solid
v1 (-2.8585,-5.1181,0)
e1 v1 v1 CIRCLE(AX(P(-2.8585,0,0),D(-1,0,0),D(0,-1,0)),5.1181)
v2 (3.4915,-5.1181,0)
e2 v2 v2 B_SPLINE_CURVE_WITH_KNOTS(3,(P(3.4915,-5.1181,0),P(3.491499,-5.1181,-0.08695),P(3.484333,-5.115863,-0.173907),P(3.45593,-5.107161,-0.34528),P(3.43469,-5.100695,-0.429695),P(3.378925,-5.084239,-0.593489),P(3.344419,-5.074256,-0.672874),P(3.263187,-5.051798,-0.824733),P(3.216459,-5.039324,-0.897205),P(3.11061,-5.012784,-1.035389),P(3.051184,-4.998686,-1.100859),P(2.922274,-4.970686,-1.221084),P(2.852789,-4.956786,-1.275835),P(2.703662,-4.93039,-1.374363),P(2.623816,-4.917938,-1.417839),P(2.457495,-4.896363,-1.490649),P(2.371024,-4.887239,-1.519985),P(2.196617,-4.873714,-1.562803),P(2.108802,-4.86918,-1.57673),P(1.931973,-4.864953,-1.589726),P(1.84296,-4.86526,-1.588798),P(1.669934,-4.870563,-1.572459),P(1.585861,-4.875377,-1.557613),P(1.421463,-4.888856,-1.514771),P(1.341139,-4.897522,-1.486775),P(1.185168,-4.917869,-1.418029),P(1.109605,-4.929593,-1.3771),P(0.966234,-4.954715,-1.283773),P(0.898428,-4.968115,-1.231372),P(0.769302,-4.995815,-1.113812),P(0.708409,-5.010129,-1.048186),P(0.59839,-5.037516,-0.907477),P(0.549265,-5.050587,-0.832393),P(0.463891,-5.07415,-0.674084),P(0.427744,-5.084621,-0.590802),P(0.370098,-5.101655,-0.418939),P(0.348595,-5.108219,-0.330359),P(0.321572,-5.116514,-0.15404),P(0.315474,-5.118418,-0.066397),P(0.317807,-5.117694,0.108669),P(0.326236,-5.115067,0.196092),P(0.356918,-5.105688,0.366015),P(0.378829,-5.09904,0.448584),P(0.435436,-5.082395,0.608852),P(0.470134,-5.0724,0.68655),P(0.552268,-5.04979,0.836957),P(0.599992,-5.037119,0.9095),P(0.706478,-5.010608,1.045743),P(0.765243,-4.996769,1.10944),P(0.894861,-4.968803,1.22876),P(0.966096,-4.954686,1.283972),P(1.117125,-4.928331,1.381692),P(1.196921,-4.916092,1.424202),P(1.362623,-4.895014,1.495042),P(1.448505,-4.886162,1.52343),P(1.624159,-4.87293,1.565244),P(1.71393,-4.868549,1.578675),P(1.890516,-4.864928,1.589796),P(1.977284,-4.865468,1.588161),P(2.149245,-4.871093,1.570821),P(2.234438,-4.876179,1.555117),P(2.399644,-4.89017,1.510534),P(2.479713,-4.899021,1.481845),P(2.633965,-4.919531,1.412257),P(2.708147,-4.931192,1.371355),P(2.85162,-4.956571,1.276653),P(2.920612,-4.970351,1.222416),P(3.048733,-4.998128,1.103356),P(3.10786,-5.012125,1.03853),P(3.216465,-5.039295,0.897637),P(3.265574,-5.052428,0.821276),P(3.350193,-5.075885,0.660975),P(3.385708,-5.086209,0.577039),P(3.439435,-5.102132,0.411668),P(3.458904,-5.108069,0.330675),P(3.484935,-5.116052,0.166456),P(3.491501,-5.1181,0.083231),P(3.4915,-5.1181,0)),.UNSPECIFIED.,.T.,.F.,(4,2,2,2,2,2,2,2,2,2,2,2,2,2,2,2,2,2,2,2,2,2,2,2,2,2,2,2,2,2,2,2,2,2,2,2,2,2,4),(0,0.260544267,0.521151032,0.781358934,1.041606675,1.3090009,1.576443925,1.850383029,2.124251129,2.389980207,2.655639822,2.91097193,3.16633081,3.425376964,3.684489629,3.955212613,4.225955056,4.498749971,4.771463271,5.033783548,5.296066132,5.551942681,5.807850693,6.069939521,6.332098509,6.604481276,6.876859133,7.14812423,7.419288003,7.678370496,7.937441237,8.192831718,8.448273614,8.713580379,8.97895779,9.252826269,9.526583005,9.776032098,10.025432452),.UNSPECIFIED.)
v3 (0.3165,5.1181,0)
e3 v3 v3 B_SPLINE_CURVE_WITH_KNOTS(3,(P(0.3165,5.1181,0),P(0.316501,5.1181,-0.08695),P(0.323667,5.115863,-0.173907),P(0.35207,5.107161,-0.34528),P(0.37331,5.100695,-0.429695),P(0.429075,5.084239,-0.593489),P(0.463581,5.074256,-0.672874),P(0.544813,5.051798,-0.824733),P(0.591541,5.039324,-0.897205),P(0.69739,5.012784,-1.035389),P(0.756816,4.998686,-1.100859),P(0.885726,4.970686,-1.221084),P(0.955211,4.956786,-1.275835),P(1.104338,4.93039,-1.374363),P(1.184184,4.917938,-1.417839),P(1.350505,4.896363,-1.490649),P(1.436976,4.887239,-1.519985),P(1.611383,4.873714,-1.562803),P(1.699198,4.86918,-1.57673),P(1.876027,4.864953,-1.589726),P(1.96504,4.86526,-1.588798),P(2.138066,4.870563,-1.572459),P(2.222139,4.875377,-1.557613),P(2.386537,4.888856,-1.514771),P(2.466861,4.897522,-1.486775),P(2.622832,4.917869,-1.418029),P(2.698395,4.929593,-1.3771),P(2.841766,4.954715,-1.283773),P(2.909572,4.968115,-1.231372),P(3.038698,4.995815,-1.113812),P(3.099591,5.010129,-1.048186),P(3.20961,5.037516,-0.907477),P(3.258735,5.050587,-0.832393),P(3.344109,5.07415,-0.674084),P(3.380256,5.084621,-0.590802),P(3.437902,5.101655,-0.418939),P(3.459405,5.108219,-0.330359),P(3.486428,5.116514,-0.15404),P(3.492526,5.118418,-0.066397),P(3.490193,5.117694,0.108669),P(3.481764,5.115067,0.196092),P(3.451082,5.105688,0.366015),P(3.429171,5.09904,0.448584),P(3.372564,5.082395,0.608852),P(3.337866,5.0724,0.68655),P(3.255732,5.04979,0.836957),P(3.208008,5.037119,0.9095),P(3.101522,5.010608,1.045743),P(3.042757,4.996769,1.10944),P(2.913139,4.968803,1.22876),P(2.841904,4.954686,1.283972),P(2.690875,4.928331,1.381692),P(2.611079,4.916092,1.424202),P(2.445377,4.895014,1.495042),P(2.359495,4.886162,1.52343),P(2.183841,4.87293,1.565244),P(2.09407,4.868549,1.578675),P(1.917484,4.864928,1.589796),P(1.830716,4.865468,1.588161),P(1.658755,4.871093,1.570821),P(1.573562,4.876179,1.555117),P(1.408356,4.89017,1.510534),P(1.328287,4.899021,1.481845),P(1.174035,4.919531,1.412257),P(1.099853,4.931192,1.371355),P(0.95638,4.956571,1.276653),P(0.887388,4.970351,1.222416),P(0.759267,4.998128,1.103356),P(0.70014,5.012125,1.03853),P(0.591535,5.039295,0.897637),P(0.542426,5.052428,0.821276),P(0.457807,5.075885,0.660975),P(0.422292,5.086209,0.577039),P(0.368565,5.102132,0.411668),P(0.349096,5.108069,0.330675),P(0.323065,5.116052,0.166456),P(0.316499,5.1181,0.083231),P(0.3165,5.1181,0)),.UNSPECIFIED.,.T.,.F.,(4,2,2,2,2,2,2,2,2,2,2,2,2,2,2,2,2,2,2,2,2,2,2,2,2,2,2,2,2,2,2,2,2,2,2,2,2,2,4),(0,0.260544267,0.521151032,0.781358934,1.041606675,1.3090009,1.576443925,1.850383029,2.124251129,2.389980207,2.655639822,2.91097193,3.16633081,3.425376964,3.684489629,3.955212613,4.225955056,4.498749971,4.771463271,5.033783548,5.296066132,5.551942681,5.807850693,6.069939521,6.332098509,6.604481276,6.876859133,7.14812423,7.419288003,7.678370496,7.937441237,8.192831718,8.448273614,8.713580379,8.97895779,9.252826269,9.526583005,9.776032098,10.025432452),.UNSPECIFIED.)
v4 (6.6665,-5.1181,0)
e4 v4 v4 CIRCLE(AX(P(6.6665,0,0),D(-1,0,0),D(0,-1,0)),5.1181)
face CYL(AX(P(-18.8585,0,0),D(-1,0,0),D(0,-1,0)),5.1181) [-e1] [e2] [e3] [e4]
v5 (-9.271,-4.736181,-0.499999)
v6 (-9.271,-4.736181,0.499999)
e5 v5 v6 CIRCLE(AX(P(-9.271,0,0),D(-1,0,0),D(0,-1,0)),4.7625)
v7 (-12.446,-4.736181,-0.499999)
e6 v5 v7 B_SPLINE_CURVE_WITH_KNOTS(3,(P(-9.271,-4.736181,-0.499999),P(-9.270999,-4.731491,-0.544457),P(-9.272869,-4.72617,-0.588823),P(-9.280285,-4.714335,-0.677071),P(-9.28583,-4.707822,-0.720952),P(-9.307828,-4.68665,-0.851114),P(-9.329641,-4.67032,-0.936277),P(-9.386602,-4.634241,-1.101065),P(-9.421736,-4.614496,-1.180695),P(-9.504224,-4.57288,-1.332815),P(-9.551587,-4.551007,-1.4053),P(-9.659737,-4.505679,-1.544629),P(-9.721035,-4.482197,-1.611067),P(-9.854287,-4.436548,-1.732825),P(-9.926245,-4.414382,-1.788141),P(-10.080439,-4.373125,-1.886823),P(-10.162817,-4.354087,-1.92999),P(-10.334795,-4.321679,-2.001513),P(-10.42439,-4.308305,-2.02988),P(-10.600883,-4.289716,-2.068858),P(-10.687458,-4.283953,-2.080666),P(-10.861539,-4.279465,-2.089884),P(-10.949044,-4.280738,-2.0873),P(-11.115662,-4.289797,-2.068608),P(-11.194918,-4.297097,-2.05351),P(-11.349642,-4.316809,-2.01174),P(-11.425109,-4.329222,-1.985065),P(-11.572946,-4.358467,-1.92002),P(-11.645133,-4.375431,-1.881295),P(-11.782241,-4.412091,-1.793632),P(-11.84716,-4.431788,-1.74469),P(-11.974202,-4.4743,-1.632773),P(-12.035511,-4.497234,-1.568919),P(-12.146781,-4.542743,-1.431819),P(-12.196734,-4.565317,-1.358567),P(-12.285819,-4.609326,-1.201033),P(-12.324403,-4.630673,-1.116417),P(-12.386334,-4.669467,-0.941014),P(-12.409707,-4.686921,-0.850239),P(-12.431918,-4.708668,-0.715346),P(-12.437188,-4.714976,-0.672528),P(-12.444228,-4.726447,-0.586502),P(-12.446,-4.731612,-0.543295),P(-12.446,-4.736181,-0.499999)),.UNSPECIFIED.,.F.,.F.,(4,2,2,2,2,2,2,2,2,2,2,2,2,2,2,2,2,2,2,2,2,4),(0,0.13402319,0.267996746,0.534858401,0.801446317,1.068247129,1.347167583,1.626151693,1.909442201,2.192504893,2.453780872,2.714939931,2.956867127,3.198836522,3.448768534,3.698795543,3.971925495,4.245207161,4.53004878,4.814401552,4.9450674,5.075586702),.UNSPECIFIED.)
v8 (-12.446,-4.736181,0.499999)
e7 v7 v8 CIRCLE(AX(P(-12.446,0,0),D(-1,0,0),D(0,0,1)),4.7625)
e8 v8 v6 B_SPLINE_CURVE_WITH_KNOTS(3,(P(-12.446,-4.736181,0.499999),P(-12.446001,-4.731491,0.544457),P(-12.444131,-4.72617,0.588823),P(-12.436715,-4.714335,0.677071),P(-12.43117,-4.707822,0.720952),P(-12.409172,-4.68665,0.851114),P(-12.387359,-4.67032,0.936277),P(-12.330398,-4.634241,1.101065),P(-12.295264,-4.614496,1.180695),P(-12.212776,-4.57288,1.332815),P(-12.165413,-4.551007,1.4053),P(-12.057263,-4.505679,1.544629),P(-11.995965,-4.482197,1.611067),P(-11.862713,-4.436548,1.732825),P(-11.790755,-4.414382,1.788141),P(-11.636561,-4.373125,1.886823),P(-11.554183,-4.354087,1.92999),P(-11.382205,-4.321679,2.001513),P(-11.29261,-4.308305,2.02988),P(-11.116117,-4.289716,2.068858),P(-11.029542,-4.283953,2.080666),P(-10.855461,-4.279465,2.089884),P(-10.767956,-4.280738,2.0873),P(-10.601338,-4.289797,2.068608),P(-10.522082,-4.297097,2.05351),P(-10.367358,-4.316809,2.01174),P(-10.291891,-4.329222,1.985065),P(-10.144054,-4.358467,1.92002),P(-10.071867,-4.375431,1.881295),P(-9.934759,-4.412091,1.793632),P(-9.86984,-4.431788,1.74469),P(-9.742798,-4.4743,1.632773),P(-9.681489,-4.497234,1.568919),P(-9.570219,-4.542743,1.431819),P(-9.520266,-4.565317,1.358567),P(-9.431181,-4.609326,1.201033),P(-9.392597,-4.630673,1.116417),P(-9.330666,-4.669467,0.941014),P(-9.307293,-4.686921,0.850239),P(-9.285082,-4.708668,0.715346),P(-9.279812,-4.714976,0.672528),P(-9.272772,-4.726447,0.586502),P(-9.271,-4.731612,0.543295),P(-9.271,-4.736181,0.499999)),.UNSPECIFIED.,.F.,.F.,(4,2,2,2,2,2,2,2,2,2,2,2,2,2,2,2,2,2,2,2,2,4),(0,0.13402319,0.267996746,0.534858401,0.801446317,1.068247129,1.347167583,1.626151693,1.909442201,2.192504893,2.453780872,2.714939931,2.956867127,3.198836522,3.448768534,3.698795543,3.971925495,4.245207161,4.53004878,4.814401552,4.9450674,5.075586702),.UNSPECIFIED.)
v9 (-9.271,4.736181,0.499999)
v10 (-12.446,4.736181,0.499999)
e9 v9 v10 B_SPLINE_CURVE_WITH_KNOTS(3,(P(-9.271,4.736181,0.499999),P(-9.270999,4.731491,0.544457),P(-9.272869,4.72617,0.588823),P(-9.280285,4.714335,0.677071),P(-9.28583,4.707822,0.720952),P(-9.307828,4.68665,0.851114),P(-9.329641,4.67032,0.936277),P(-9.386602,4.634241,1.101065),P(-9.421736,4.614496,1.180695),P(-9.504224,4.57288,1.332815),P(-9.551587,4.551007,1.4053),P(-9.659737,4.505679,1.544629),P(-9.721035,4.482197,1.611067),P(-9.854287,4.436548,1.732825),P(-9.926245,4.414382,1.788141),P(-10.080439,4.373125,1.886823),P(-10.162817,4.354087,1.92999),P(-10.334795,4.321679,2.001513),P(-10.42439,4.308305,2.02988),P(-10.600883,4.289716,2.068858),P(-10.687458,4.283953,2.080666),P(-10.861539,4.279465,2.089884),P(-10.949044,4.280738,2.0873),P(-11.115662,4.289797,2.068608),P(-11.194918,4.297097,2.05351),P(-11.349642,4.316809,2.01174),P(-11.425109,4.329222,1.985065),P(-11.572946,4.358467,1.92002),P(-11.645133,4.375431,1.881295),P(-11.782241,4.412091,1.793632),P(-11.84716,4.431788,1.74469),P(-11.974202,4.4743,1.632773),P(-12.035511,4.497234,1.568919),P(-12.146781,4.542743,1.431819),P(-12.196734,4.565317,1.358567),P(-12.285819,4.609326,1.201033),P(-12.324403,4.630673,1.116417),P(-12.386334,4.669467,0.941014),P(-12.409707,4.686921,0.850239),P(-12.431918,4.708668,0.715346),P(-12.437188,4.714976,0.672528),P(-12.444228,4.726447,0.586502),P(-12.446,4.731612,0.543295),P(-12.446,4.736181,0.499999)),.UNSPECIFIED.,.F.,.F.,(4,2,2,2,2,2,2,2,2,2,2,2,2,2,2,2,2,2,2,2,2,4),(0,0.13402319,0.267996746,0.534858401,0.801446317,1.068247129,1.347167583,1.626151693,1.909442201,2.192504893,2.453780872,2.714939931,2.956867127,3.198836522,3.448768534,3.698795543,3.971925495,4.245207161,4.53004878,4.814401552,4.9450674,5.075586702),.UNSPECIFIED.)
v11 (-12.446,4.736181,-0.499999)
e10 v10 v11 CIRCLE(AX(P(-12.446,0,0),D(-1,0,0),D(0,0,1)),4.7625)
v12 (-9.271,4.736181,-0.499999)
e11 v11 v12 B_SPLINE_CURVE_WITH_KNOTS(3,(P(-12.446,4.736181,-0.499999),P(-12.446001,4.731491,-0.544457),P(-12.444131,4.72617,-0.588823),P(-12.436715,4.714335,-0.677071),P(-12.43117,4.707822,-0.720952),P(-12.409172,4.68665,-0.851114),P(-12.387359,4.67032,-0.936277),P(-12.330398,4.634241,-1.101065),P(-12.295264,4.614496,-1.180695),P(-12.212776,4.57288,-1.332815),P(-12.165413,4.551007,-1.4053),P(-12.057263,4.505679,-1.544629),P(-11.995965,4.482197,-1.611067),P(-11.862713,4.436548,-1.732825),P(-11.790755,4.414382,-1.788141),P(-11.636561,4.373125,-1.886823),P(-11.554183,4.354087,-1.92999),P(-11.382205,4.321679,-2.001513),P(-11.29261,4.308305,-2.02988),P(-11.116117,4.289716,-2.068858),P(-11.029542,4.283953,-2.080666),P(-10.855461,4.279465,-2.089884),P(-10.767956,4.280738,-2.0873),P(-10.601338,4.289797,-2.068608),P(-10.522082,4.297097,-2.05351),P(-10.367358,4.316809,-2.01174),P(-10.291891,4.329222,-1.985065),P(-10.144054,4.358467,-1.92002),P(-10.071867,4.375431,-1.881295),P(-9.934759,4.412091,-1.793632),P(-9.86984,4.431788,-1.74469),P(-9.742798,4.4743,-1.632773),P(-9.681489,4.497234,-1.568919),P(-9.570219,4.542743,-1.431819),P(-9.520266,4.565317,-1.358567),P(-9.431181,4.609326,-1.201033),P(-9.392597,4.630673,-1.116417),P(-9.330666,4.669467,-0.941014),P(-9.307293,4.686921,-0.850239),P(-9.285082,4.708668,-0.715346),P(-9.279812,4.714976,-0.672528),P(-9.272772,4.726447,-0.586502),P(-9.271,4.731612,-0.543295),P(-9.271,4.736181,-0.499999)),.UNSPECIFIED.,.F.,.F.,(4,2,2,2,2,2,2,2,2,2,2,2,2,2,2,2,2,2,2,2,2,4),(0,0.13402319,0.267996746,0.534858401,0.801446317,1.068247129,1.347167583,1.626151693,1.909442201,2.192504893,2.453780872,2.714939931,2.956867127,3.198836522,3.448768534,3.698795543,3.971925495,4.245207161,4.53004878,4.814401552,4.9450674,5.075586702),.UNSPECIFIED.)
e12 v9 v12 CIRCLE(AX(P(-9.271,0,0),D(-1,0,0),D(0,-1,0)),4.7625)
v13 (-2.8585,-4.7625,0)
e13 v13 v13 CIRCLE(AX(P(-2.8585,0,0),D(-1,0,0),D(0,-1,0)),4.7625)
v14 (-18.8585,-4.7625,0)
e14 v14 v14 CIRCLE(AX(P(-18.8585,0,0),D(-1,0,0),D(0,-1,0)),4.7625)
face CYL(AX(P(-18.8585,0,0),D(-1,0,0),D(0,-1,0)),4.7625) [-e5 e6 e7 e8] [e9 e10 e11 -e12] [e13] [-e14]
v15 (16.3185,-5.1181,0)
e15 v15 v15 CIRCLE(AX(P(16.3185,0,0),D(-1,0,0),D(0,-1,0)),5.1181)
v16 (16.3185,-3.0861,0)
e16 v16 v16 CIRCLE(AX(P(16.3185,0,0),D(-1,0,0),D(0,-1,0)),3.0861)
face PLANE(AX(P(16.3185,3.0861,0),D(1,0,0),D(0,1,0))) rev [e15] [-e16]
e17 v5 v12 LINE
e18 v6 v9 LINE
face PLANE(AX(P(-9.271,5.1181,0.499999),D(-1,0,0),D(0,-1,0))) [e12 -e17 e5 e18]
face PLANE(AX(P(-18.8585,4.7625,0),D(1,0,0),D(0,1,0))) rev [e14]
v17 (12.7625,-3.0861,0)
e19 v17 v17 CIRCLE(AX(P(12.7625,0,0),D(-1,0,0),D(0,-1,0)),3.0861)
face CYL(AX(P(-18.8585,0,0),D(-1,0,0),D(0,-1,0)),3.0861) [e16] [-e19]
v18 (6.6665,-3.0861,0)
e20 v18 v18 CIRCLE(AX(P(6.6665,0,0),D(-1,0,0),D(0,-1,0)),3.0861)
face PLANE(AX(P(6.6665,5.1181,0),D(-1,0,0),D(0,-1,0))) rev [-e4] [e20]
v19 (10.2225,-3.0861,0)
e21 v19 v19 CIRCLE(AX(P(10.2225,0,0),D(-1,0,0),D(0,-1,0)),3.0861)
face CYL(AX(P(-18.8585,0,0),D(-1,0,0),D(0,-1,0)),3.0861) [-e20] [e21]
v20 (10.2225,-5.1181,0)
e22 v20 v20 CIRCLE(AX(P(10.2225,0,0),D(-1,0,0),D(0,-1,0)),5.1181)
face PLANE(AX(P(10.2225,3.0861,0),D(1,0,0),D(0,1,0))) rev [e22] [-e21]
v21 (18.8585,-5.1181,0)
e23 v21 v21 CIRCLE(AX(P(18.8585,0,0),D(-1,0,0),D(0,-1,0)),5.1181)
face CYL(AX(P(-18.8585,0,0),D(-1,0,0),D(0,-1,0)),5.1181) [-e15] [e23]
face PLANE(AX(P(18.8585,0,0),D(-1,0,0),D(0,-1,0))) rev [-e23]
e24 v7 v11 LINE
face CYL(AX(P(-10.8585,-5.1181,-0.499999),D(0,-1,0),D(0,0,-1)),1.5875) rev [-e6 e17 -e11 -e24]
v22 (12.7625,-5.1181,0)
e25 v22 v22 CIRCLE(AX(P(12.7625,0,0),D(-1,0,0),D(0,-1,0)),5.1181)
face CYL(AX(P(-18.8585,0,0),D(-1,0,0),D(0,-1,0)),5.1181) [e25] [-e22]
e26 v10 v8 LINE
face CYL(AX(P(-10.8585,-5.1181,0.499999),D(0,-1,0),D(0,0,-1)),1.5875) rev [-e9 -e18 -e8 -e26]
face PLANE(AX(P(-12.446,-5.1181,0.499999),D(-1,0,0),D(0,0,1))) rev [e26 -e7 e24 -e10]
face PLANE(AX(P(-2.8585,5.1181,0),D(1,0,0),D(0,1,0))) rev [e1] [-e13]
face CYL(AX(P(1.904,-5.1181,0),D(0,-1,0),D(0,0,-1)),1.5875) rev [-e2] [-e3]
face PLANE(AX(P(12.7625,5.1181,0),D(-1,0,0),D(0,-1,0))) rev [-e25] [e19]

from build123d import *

# Parameters (mm, degrees)
F_1_8_0_125_DIAMETER_HOLE1_D   = 3.175
F_1_8_START                    = -4.7625001
F_1_8_0_1250_DOWEL_SLOT1_DEPTH = 9.5250001


# Read off the part's stored shape, not the designer's step: 1/8 (0.1250) Dowel Slot1
with BuildPart() as part:
    # Sketch1 → Revolve1 (revolve)
    with BuildSketch(Plane.XY, mode=Mode.PRIVATE) as revolve1_sk:
        Polygon((-18.8585, 0), (18.8585, 0), (18.8585, 5.1181), (16.3185, 5.1181), (16.3185, 3.0861), (12.7625, 3.0861), (12.7625, 5.1181), (10.2225, 5.1181), (10.2225, 3.0861), (6.6665, 3.0861), (6.6665, 5.1181), (-2.8585, 5.1181), (-2.8585, 4.7625), (-18.8585, 4.7625), align=None)
    revolve(revolve1_sk.sketch.rotate(Axis((-18.8585, 0, 0), (1, 0, 0)), 180), axis=Axis((-18.8585, 0, 0), (1, 0, 0)))

    # 1/8 (0.125) Diameter Hole1 (through all)
    with Locations(Plane(origin=(0, -5.1181, 0), x_dir=(-1, 0, 0), z_dir=(0, -1, 0))):
        with Locations((-1.904, 0)):
            Hole(F_1_8_0_125_DIAMETER_HOLE1_D / 2)

    # 1/8 (0.1250) Dowel Slot1 outline → 1/8 (0.1250) Dowel Slot1 (cut)
    with BuildSketch(Plane(origin=(0, 0, 0), x_dir=(1, 0, 0), z_dir=(0, 1, 0)).offset(F_1_8_START)):
        with BuildLine():
            ThreePointArc((-9.271, 0.499999), (-10.8585, 2.087499), (-12.446, 0.499999))
            Line((-12.446, 0.499999), (-12.446, -0.499999))
            ThreePointArc((-12.446, -0.499999), (-10.8585, -2.087499), (-9.271, -0.499999))
            Line((-9.271, -0.499999), (-9.271, 0.499999))
        make_face()
    extrude(amount=F_1_8_0_1250_DOWEL_SLOT1_DEPTH, mode=Mode.SUBTRACT)


solid = part.part
